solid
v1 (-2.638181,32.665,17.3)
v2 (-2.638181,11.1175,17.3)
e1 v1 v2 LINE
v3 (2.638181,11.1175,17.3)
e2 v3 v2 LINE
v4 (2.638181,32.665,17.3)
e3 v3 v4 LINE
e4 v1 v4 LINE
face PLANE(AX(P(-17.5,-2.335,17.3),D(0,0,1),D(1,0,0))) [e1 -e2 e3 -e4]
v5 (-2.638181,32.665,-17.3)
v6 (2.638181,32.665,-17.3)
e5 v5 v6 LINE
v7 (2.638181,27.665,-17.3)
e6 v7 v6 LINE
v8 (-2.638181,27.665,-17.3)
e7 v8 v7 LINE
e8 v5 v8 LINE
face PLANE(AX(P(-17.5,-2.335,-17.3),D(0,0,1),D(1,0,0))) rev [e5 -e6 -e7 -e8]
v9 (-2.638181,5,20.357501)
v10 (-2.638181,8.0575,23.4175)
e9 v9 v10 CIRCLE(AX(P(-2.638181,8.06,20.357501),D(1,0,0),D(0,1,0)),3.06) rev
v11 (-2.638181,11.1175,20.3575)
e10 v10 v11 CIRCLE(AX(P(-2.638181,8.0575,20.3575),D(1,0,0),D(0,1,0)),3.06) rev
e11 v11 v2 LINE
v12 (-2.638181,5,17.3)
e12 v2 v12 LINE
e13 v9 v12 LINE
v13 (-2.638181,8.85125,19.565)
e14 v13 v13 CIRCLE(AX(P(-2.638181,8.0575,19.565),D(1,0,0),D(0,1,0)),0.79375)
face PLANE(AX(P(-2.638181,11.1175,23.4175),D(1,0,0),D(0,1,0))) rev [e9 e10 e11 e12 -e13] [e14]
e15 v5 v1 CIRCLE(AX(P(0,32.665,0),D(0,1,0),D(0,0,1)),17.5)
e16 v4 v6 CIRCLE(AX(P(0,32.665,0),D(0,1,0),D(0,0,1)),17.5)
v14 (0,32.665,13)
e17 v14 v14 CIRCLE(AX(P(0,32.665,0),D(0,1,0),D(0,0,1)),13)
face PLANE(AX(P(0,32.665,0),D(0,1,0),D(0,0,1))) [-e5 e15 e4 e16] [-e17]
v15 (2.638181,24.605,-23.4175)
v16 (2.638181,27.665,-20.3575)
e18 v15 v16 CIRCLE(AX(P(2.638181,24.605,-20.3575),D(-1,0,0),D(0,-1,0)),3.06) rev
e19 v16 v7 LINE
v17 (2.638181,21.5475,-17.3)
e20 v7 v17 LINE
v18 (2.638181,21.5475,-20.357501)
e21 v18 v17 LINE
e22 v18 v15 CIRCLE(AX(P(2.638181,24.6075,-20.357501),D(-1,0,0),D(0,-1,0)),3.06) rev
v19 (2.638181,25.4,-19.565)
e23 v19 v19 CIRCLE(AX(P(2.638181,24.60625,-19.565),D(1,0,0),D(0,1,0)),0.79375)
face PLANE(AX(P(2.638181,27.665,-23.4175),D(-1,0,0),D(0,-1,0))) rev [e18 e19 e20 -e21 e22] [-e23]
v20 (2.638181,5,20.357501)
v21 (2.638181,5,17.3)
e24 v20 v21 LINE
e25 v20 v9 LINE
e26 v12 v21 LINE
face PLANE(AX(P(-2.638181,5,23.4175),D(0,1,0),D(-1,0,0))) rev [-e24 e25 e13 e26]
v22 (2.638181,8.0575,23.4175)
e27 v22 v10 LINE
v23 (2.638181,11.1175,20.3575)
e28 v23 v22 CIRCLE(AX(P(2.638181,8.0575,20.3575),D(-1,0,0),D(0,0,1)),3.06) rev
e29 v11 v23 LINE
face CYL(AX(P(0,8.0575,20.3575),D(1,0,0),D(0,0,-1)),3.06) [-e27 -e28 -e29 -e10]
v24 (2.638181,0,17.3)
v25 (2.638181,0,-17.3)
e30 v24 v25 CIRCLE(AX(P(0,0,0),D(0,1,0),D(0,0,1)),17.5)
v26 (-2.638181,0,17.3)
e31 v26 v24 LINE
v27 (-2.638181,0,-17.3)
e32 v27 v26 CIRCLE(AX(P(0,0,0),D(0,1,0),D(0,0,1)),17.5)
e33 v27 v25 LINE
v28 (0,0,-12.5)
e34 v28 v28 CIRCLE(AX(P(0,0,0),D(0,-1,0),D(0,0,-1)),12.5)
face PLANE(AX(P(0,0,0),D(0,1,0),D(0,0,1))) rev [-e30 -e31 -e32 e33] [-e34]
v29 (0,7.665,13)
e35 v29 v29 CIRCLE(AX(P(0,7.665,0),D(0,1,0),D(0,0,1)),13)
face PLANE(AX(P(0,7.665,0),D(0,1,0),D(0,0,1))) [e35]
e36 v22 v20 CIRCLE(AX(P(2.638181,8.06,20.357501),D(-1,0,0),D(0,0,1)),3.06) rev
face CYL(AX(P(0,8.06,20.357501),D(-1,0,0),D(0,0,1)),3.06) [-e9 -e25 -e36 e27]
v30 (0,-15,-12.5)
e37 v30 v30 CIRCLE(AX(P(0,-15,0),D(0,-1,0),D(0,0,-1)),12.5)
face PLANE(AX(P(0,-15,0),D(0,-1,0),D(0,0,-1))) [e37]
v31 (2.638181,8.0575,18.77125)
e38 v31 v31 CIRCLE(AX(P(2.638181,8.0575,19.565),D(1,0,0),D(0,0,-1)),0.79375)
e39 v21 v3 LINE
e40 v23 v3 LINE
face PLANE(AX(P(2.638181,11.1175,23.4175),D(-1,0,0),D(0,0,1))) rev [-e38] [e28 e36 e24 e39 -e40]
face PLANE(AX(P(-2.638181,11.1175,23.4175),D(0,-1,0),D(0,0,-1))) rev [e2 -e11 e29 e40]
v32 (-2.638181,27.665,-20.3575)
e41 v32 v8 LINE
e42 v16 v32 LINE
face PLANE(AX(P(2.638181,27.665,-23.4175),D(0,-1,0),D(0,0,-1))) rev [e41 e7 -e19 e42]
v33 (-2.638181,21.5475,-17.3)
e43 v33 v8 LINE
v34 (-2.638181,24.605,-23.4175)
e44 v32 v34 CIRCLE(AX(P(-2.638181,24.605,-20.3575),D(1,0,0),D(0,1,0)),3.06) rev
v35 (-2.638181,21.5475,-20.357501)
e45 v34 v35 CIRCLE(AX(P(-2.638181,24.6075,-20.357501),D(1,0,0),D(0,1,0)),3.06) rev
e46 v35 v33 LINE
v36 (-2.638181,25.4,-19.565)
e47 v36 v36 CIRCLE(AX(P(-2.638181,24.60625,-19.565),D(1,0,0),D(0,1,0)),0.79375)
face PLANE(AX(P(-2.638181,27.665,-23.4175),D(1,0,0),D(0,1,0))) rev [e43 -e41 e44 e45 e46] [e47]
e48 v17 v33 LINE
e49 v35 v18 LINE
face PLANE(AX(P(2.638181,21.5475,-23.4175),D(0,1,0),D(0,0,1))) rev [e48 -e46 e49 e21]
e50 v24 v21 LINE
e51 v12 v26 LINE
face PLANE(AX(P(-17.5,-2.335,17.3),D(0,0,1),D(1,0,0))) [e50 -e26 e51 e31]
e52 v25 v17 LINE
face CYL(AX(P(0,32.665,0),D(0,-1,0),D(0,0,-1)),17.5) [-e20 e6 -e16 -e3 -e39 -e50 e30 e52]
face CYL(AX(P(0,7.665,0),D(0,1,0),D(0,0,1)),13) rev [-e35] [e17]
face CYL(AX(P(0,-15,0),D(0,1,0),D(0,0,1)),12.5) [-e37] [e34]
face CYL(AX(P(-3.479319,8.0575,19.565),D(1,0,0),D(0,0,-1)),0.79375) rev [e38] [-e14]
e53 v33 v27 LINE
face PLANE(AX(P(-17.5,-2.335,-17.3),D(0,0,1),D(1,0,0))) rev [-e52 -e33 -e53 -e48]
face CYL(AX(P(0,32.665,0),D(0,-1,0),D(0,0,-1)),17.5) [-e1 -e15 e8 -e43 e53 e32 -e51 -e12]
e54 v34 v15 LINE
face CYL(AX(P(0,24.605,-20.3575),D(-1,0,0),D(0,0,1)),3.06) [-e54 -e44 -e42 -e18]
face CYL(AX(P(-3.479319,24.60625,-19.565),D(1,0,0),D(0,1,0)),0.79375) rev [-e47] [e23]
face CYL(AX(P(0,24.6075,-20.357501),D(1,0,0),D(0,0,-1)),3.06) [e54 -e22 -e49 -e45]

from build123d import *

# Parameters (mm, degrees)
SKETCH2_R           = 17.5
BOSS_EXTRUDE1_DEPTH = 32.665
SKETCH3_R           = 12.5
BOSS_EXTRUDE2_DEPTH = 15
SKETCH4_R           = 13
CUT_EXTRUDE1_DEPTH  = 25
SKETCH8_W           = 35
SKETCH8_H           = 1.857450862
CUT_EXTRUDE4_DEPTH  = 35
SKETCH11_W          = 35
SKETCH11_H          = 2.234434129
CUT_EXTRUDE8_DEPTH  = 35
SKETCH13_W          = 5.276362384
SKETCH13_H          = 6.1175
BOSS_EXTRUDE3_DEPTH = 6.1175
SKETCH14_W          = 5.276362384
SKETCH14_H          = 6.1175
BOSS_EXTRUDE4_DEPTH = 6.1175
SKETCH18_R          = 0.79375
CUT_EXTRUDE11_DEPTH = 6.1175
SKETCH15_R          = 0.79375
CUT_EXTRUDE12_DEPTH = 6.1175
FILLET8_R           = 3.06
FILLET9_R           = 3.06
FILLET10_R          = 3.06
FILLET11_R          = 3.06


with BuildPart() as part:
    # Sketch2 → Boss-Extrude1 (new body)
    with BuildSketch(Plane(origin=(0, 0, 0), x_dir=(1, 0, 0), z_dir=(0, 1, 0))):
        with Locations(Location((0, 0, 0), (0, 0, 270))):
            Circle(SKETCH2_R)
    extrude(amount=BOSS_EXTRUDE1_DEPTH)

    # Sketch3 → Boss-Extrude2 (add)
    with BuildSketch(Plane.XZ):
        with Locations(Location((0, 0, 0), (0, 0, 270))):
            Circle(SKETCH3_R)
    extrude(amount=BOSS_EXTRUDE2_DEPTH)

    # Sketch4 → Cut-Extrude1 (cut)
    with BuildSketch(Plane(origin=(0, 32.665, 0), x_dir=(1, 0, 0), z_dir=(0, 1, 0))):
        with Locations(Location((0, 0, 0), (0, 0, 270))):
            Circle(SKETCH4_R)
    extrude(amount=-CUT_EXTRUDE1_DEPTH, mode=Mode.SUBTRACT)

    # Sketch8 → Cut-Extrude4 (cut)
    with BuildSketch(Plane(origin=(0, 32.665, 0), x_dir=(1, 0, 0), z_dir=(0, 1, 0))):
        with Locations((0, -18.228725431)):
            Rectangle(SKETCH8_W, SKETCH8_H)
    extrude(amount=-CUT_EXTRUDE4_DEPTH, mode=Mode.SUBTRACT)

    # Sketch11 → Cut-Extrude8 (cut)
    with BuildSketch(Plane(origin=(0, 32.665, 0), x_dir=(1, 0, 0), z_dir=(0, 1, 0))):
        with Locations((0, 18.417217065)):
            Rectangle(SKETCH11_W, SKETCH11_H)
    extrude(amount=-CUT_EXTRUDE8_DEPTH, mode=Mode.SUBTRACT)

    # Sketch13 → Boss-Extrude3 (add)
    with BuildSketch(Plane(origin=(0, 0, -17.3), x_dir=(-1, 0, 0), z_dir=(0, 0, -1))):
        with Locations((0, 24.60625)):
            Rectangle(SKETCH13_W, SKETCH13_H)
    extrude(amount=BOSS_EXTRUDE3_DEPTH)

    # Sketch14 → Boss-Extrude4 (add)
    with BuildSketch(Plane.XY.offset(17.3)):
        with Locations((0, 8.05875)):
            Rectangle(SKETCH14_W, SKETCH14_H)
    extrude(amount=BOSS_EXTRUDE4_DEPTH)

    # Sketch18 → Cut-Extrude11 (cut)
    with BuildSketch(Plane(origin=(2.638181192, 0, 0), x_dir=(0, 0, -1), z_dir=(1, 0, 0))):
        with Locations((-19.565, 8.0575)):
            Circle(SKETCH18_R)
    extrude(amount=-CUT_EXTRUDE11_DEPTH, mode=Mode.SUBTRACT)

    # Sketch15 → Cut-Extrude12 (cut)
    with BuildSketch(Plane(origin=(2.638181192, 0, 0), x_dir=(0, 0, -1), z_dir=(1, 0, 0))):
        with Locations(Location((19.565, 24.60625, 0), (0, 0, 90))):
            Circle(SKETCH15_R)
    extrude(amount=-CUT_EXTRUDE12_DEPTH, mode=Mode.SUBTRACT)

    # Fillet8
    fillet8_edges = [part.edges().sort_by_distance(p)[0] for p in [
        (0, 27.665, -23.4175),
    ]]
    fillet(fillet8_edges, radius=FILLET8_R)

    # Fillet9
    # the kernel refuses this fillet: 3.06 mm, written as the material it takes off along each edge
    with BuildSketch(Plane(origin=(-10.288181192, 21.5475, -23.4175), x_dir=(0, 1, 0), z_dir=(1, 0, 0))) as fillet9_piece_1:
        with BuildLine():
            CenterArc((FILLET9_R, FILLET9_R), FILLET9_R, 180, 90)
            Line((0, FILLET9_R), (0, 0))
            Line((0, 0), (FILLET9_R, 0))
        make_face()
    extrude(amount=20.576362383, mode=Mode.SUBTRACT)

    # Fillet10
    fillet10_edges = [part.edges().sort_by_distance(p)[0] for p in [
        (0, 11.1175, 23.4175),
    ]]
    fillet(fillet10_edges, radius=FILLET10_R)

    # Fillet11
    # the kernel refuses this fillet: 3.06 mm, written as the material it takes off along each edge
    with BuildSketch(Plane(origin=(10.288181192, 5, 23.4175), x_dir=(0, 1, 0), z_dir=(-1, 0, 0))) as fillet11_piece_1:
        with BuildLine():
            CenterArc((FILLET11_R, FILLET11_R), FILLET11_R, 180, 90)
            Line((0, FILLET11_R), (0, 0))
            Line((0, 0), (FILLET11_R, 0))
        make_face()
    extrude(amount=20.576362383, mode=Mode.SUBTRACT)


solid = part.part
